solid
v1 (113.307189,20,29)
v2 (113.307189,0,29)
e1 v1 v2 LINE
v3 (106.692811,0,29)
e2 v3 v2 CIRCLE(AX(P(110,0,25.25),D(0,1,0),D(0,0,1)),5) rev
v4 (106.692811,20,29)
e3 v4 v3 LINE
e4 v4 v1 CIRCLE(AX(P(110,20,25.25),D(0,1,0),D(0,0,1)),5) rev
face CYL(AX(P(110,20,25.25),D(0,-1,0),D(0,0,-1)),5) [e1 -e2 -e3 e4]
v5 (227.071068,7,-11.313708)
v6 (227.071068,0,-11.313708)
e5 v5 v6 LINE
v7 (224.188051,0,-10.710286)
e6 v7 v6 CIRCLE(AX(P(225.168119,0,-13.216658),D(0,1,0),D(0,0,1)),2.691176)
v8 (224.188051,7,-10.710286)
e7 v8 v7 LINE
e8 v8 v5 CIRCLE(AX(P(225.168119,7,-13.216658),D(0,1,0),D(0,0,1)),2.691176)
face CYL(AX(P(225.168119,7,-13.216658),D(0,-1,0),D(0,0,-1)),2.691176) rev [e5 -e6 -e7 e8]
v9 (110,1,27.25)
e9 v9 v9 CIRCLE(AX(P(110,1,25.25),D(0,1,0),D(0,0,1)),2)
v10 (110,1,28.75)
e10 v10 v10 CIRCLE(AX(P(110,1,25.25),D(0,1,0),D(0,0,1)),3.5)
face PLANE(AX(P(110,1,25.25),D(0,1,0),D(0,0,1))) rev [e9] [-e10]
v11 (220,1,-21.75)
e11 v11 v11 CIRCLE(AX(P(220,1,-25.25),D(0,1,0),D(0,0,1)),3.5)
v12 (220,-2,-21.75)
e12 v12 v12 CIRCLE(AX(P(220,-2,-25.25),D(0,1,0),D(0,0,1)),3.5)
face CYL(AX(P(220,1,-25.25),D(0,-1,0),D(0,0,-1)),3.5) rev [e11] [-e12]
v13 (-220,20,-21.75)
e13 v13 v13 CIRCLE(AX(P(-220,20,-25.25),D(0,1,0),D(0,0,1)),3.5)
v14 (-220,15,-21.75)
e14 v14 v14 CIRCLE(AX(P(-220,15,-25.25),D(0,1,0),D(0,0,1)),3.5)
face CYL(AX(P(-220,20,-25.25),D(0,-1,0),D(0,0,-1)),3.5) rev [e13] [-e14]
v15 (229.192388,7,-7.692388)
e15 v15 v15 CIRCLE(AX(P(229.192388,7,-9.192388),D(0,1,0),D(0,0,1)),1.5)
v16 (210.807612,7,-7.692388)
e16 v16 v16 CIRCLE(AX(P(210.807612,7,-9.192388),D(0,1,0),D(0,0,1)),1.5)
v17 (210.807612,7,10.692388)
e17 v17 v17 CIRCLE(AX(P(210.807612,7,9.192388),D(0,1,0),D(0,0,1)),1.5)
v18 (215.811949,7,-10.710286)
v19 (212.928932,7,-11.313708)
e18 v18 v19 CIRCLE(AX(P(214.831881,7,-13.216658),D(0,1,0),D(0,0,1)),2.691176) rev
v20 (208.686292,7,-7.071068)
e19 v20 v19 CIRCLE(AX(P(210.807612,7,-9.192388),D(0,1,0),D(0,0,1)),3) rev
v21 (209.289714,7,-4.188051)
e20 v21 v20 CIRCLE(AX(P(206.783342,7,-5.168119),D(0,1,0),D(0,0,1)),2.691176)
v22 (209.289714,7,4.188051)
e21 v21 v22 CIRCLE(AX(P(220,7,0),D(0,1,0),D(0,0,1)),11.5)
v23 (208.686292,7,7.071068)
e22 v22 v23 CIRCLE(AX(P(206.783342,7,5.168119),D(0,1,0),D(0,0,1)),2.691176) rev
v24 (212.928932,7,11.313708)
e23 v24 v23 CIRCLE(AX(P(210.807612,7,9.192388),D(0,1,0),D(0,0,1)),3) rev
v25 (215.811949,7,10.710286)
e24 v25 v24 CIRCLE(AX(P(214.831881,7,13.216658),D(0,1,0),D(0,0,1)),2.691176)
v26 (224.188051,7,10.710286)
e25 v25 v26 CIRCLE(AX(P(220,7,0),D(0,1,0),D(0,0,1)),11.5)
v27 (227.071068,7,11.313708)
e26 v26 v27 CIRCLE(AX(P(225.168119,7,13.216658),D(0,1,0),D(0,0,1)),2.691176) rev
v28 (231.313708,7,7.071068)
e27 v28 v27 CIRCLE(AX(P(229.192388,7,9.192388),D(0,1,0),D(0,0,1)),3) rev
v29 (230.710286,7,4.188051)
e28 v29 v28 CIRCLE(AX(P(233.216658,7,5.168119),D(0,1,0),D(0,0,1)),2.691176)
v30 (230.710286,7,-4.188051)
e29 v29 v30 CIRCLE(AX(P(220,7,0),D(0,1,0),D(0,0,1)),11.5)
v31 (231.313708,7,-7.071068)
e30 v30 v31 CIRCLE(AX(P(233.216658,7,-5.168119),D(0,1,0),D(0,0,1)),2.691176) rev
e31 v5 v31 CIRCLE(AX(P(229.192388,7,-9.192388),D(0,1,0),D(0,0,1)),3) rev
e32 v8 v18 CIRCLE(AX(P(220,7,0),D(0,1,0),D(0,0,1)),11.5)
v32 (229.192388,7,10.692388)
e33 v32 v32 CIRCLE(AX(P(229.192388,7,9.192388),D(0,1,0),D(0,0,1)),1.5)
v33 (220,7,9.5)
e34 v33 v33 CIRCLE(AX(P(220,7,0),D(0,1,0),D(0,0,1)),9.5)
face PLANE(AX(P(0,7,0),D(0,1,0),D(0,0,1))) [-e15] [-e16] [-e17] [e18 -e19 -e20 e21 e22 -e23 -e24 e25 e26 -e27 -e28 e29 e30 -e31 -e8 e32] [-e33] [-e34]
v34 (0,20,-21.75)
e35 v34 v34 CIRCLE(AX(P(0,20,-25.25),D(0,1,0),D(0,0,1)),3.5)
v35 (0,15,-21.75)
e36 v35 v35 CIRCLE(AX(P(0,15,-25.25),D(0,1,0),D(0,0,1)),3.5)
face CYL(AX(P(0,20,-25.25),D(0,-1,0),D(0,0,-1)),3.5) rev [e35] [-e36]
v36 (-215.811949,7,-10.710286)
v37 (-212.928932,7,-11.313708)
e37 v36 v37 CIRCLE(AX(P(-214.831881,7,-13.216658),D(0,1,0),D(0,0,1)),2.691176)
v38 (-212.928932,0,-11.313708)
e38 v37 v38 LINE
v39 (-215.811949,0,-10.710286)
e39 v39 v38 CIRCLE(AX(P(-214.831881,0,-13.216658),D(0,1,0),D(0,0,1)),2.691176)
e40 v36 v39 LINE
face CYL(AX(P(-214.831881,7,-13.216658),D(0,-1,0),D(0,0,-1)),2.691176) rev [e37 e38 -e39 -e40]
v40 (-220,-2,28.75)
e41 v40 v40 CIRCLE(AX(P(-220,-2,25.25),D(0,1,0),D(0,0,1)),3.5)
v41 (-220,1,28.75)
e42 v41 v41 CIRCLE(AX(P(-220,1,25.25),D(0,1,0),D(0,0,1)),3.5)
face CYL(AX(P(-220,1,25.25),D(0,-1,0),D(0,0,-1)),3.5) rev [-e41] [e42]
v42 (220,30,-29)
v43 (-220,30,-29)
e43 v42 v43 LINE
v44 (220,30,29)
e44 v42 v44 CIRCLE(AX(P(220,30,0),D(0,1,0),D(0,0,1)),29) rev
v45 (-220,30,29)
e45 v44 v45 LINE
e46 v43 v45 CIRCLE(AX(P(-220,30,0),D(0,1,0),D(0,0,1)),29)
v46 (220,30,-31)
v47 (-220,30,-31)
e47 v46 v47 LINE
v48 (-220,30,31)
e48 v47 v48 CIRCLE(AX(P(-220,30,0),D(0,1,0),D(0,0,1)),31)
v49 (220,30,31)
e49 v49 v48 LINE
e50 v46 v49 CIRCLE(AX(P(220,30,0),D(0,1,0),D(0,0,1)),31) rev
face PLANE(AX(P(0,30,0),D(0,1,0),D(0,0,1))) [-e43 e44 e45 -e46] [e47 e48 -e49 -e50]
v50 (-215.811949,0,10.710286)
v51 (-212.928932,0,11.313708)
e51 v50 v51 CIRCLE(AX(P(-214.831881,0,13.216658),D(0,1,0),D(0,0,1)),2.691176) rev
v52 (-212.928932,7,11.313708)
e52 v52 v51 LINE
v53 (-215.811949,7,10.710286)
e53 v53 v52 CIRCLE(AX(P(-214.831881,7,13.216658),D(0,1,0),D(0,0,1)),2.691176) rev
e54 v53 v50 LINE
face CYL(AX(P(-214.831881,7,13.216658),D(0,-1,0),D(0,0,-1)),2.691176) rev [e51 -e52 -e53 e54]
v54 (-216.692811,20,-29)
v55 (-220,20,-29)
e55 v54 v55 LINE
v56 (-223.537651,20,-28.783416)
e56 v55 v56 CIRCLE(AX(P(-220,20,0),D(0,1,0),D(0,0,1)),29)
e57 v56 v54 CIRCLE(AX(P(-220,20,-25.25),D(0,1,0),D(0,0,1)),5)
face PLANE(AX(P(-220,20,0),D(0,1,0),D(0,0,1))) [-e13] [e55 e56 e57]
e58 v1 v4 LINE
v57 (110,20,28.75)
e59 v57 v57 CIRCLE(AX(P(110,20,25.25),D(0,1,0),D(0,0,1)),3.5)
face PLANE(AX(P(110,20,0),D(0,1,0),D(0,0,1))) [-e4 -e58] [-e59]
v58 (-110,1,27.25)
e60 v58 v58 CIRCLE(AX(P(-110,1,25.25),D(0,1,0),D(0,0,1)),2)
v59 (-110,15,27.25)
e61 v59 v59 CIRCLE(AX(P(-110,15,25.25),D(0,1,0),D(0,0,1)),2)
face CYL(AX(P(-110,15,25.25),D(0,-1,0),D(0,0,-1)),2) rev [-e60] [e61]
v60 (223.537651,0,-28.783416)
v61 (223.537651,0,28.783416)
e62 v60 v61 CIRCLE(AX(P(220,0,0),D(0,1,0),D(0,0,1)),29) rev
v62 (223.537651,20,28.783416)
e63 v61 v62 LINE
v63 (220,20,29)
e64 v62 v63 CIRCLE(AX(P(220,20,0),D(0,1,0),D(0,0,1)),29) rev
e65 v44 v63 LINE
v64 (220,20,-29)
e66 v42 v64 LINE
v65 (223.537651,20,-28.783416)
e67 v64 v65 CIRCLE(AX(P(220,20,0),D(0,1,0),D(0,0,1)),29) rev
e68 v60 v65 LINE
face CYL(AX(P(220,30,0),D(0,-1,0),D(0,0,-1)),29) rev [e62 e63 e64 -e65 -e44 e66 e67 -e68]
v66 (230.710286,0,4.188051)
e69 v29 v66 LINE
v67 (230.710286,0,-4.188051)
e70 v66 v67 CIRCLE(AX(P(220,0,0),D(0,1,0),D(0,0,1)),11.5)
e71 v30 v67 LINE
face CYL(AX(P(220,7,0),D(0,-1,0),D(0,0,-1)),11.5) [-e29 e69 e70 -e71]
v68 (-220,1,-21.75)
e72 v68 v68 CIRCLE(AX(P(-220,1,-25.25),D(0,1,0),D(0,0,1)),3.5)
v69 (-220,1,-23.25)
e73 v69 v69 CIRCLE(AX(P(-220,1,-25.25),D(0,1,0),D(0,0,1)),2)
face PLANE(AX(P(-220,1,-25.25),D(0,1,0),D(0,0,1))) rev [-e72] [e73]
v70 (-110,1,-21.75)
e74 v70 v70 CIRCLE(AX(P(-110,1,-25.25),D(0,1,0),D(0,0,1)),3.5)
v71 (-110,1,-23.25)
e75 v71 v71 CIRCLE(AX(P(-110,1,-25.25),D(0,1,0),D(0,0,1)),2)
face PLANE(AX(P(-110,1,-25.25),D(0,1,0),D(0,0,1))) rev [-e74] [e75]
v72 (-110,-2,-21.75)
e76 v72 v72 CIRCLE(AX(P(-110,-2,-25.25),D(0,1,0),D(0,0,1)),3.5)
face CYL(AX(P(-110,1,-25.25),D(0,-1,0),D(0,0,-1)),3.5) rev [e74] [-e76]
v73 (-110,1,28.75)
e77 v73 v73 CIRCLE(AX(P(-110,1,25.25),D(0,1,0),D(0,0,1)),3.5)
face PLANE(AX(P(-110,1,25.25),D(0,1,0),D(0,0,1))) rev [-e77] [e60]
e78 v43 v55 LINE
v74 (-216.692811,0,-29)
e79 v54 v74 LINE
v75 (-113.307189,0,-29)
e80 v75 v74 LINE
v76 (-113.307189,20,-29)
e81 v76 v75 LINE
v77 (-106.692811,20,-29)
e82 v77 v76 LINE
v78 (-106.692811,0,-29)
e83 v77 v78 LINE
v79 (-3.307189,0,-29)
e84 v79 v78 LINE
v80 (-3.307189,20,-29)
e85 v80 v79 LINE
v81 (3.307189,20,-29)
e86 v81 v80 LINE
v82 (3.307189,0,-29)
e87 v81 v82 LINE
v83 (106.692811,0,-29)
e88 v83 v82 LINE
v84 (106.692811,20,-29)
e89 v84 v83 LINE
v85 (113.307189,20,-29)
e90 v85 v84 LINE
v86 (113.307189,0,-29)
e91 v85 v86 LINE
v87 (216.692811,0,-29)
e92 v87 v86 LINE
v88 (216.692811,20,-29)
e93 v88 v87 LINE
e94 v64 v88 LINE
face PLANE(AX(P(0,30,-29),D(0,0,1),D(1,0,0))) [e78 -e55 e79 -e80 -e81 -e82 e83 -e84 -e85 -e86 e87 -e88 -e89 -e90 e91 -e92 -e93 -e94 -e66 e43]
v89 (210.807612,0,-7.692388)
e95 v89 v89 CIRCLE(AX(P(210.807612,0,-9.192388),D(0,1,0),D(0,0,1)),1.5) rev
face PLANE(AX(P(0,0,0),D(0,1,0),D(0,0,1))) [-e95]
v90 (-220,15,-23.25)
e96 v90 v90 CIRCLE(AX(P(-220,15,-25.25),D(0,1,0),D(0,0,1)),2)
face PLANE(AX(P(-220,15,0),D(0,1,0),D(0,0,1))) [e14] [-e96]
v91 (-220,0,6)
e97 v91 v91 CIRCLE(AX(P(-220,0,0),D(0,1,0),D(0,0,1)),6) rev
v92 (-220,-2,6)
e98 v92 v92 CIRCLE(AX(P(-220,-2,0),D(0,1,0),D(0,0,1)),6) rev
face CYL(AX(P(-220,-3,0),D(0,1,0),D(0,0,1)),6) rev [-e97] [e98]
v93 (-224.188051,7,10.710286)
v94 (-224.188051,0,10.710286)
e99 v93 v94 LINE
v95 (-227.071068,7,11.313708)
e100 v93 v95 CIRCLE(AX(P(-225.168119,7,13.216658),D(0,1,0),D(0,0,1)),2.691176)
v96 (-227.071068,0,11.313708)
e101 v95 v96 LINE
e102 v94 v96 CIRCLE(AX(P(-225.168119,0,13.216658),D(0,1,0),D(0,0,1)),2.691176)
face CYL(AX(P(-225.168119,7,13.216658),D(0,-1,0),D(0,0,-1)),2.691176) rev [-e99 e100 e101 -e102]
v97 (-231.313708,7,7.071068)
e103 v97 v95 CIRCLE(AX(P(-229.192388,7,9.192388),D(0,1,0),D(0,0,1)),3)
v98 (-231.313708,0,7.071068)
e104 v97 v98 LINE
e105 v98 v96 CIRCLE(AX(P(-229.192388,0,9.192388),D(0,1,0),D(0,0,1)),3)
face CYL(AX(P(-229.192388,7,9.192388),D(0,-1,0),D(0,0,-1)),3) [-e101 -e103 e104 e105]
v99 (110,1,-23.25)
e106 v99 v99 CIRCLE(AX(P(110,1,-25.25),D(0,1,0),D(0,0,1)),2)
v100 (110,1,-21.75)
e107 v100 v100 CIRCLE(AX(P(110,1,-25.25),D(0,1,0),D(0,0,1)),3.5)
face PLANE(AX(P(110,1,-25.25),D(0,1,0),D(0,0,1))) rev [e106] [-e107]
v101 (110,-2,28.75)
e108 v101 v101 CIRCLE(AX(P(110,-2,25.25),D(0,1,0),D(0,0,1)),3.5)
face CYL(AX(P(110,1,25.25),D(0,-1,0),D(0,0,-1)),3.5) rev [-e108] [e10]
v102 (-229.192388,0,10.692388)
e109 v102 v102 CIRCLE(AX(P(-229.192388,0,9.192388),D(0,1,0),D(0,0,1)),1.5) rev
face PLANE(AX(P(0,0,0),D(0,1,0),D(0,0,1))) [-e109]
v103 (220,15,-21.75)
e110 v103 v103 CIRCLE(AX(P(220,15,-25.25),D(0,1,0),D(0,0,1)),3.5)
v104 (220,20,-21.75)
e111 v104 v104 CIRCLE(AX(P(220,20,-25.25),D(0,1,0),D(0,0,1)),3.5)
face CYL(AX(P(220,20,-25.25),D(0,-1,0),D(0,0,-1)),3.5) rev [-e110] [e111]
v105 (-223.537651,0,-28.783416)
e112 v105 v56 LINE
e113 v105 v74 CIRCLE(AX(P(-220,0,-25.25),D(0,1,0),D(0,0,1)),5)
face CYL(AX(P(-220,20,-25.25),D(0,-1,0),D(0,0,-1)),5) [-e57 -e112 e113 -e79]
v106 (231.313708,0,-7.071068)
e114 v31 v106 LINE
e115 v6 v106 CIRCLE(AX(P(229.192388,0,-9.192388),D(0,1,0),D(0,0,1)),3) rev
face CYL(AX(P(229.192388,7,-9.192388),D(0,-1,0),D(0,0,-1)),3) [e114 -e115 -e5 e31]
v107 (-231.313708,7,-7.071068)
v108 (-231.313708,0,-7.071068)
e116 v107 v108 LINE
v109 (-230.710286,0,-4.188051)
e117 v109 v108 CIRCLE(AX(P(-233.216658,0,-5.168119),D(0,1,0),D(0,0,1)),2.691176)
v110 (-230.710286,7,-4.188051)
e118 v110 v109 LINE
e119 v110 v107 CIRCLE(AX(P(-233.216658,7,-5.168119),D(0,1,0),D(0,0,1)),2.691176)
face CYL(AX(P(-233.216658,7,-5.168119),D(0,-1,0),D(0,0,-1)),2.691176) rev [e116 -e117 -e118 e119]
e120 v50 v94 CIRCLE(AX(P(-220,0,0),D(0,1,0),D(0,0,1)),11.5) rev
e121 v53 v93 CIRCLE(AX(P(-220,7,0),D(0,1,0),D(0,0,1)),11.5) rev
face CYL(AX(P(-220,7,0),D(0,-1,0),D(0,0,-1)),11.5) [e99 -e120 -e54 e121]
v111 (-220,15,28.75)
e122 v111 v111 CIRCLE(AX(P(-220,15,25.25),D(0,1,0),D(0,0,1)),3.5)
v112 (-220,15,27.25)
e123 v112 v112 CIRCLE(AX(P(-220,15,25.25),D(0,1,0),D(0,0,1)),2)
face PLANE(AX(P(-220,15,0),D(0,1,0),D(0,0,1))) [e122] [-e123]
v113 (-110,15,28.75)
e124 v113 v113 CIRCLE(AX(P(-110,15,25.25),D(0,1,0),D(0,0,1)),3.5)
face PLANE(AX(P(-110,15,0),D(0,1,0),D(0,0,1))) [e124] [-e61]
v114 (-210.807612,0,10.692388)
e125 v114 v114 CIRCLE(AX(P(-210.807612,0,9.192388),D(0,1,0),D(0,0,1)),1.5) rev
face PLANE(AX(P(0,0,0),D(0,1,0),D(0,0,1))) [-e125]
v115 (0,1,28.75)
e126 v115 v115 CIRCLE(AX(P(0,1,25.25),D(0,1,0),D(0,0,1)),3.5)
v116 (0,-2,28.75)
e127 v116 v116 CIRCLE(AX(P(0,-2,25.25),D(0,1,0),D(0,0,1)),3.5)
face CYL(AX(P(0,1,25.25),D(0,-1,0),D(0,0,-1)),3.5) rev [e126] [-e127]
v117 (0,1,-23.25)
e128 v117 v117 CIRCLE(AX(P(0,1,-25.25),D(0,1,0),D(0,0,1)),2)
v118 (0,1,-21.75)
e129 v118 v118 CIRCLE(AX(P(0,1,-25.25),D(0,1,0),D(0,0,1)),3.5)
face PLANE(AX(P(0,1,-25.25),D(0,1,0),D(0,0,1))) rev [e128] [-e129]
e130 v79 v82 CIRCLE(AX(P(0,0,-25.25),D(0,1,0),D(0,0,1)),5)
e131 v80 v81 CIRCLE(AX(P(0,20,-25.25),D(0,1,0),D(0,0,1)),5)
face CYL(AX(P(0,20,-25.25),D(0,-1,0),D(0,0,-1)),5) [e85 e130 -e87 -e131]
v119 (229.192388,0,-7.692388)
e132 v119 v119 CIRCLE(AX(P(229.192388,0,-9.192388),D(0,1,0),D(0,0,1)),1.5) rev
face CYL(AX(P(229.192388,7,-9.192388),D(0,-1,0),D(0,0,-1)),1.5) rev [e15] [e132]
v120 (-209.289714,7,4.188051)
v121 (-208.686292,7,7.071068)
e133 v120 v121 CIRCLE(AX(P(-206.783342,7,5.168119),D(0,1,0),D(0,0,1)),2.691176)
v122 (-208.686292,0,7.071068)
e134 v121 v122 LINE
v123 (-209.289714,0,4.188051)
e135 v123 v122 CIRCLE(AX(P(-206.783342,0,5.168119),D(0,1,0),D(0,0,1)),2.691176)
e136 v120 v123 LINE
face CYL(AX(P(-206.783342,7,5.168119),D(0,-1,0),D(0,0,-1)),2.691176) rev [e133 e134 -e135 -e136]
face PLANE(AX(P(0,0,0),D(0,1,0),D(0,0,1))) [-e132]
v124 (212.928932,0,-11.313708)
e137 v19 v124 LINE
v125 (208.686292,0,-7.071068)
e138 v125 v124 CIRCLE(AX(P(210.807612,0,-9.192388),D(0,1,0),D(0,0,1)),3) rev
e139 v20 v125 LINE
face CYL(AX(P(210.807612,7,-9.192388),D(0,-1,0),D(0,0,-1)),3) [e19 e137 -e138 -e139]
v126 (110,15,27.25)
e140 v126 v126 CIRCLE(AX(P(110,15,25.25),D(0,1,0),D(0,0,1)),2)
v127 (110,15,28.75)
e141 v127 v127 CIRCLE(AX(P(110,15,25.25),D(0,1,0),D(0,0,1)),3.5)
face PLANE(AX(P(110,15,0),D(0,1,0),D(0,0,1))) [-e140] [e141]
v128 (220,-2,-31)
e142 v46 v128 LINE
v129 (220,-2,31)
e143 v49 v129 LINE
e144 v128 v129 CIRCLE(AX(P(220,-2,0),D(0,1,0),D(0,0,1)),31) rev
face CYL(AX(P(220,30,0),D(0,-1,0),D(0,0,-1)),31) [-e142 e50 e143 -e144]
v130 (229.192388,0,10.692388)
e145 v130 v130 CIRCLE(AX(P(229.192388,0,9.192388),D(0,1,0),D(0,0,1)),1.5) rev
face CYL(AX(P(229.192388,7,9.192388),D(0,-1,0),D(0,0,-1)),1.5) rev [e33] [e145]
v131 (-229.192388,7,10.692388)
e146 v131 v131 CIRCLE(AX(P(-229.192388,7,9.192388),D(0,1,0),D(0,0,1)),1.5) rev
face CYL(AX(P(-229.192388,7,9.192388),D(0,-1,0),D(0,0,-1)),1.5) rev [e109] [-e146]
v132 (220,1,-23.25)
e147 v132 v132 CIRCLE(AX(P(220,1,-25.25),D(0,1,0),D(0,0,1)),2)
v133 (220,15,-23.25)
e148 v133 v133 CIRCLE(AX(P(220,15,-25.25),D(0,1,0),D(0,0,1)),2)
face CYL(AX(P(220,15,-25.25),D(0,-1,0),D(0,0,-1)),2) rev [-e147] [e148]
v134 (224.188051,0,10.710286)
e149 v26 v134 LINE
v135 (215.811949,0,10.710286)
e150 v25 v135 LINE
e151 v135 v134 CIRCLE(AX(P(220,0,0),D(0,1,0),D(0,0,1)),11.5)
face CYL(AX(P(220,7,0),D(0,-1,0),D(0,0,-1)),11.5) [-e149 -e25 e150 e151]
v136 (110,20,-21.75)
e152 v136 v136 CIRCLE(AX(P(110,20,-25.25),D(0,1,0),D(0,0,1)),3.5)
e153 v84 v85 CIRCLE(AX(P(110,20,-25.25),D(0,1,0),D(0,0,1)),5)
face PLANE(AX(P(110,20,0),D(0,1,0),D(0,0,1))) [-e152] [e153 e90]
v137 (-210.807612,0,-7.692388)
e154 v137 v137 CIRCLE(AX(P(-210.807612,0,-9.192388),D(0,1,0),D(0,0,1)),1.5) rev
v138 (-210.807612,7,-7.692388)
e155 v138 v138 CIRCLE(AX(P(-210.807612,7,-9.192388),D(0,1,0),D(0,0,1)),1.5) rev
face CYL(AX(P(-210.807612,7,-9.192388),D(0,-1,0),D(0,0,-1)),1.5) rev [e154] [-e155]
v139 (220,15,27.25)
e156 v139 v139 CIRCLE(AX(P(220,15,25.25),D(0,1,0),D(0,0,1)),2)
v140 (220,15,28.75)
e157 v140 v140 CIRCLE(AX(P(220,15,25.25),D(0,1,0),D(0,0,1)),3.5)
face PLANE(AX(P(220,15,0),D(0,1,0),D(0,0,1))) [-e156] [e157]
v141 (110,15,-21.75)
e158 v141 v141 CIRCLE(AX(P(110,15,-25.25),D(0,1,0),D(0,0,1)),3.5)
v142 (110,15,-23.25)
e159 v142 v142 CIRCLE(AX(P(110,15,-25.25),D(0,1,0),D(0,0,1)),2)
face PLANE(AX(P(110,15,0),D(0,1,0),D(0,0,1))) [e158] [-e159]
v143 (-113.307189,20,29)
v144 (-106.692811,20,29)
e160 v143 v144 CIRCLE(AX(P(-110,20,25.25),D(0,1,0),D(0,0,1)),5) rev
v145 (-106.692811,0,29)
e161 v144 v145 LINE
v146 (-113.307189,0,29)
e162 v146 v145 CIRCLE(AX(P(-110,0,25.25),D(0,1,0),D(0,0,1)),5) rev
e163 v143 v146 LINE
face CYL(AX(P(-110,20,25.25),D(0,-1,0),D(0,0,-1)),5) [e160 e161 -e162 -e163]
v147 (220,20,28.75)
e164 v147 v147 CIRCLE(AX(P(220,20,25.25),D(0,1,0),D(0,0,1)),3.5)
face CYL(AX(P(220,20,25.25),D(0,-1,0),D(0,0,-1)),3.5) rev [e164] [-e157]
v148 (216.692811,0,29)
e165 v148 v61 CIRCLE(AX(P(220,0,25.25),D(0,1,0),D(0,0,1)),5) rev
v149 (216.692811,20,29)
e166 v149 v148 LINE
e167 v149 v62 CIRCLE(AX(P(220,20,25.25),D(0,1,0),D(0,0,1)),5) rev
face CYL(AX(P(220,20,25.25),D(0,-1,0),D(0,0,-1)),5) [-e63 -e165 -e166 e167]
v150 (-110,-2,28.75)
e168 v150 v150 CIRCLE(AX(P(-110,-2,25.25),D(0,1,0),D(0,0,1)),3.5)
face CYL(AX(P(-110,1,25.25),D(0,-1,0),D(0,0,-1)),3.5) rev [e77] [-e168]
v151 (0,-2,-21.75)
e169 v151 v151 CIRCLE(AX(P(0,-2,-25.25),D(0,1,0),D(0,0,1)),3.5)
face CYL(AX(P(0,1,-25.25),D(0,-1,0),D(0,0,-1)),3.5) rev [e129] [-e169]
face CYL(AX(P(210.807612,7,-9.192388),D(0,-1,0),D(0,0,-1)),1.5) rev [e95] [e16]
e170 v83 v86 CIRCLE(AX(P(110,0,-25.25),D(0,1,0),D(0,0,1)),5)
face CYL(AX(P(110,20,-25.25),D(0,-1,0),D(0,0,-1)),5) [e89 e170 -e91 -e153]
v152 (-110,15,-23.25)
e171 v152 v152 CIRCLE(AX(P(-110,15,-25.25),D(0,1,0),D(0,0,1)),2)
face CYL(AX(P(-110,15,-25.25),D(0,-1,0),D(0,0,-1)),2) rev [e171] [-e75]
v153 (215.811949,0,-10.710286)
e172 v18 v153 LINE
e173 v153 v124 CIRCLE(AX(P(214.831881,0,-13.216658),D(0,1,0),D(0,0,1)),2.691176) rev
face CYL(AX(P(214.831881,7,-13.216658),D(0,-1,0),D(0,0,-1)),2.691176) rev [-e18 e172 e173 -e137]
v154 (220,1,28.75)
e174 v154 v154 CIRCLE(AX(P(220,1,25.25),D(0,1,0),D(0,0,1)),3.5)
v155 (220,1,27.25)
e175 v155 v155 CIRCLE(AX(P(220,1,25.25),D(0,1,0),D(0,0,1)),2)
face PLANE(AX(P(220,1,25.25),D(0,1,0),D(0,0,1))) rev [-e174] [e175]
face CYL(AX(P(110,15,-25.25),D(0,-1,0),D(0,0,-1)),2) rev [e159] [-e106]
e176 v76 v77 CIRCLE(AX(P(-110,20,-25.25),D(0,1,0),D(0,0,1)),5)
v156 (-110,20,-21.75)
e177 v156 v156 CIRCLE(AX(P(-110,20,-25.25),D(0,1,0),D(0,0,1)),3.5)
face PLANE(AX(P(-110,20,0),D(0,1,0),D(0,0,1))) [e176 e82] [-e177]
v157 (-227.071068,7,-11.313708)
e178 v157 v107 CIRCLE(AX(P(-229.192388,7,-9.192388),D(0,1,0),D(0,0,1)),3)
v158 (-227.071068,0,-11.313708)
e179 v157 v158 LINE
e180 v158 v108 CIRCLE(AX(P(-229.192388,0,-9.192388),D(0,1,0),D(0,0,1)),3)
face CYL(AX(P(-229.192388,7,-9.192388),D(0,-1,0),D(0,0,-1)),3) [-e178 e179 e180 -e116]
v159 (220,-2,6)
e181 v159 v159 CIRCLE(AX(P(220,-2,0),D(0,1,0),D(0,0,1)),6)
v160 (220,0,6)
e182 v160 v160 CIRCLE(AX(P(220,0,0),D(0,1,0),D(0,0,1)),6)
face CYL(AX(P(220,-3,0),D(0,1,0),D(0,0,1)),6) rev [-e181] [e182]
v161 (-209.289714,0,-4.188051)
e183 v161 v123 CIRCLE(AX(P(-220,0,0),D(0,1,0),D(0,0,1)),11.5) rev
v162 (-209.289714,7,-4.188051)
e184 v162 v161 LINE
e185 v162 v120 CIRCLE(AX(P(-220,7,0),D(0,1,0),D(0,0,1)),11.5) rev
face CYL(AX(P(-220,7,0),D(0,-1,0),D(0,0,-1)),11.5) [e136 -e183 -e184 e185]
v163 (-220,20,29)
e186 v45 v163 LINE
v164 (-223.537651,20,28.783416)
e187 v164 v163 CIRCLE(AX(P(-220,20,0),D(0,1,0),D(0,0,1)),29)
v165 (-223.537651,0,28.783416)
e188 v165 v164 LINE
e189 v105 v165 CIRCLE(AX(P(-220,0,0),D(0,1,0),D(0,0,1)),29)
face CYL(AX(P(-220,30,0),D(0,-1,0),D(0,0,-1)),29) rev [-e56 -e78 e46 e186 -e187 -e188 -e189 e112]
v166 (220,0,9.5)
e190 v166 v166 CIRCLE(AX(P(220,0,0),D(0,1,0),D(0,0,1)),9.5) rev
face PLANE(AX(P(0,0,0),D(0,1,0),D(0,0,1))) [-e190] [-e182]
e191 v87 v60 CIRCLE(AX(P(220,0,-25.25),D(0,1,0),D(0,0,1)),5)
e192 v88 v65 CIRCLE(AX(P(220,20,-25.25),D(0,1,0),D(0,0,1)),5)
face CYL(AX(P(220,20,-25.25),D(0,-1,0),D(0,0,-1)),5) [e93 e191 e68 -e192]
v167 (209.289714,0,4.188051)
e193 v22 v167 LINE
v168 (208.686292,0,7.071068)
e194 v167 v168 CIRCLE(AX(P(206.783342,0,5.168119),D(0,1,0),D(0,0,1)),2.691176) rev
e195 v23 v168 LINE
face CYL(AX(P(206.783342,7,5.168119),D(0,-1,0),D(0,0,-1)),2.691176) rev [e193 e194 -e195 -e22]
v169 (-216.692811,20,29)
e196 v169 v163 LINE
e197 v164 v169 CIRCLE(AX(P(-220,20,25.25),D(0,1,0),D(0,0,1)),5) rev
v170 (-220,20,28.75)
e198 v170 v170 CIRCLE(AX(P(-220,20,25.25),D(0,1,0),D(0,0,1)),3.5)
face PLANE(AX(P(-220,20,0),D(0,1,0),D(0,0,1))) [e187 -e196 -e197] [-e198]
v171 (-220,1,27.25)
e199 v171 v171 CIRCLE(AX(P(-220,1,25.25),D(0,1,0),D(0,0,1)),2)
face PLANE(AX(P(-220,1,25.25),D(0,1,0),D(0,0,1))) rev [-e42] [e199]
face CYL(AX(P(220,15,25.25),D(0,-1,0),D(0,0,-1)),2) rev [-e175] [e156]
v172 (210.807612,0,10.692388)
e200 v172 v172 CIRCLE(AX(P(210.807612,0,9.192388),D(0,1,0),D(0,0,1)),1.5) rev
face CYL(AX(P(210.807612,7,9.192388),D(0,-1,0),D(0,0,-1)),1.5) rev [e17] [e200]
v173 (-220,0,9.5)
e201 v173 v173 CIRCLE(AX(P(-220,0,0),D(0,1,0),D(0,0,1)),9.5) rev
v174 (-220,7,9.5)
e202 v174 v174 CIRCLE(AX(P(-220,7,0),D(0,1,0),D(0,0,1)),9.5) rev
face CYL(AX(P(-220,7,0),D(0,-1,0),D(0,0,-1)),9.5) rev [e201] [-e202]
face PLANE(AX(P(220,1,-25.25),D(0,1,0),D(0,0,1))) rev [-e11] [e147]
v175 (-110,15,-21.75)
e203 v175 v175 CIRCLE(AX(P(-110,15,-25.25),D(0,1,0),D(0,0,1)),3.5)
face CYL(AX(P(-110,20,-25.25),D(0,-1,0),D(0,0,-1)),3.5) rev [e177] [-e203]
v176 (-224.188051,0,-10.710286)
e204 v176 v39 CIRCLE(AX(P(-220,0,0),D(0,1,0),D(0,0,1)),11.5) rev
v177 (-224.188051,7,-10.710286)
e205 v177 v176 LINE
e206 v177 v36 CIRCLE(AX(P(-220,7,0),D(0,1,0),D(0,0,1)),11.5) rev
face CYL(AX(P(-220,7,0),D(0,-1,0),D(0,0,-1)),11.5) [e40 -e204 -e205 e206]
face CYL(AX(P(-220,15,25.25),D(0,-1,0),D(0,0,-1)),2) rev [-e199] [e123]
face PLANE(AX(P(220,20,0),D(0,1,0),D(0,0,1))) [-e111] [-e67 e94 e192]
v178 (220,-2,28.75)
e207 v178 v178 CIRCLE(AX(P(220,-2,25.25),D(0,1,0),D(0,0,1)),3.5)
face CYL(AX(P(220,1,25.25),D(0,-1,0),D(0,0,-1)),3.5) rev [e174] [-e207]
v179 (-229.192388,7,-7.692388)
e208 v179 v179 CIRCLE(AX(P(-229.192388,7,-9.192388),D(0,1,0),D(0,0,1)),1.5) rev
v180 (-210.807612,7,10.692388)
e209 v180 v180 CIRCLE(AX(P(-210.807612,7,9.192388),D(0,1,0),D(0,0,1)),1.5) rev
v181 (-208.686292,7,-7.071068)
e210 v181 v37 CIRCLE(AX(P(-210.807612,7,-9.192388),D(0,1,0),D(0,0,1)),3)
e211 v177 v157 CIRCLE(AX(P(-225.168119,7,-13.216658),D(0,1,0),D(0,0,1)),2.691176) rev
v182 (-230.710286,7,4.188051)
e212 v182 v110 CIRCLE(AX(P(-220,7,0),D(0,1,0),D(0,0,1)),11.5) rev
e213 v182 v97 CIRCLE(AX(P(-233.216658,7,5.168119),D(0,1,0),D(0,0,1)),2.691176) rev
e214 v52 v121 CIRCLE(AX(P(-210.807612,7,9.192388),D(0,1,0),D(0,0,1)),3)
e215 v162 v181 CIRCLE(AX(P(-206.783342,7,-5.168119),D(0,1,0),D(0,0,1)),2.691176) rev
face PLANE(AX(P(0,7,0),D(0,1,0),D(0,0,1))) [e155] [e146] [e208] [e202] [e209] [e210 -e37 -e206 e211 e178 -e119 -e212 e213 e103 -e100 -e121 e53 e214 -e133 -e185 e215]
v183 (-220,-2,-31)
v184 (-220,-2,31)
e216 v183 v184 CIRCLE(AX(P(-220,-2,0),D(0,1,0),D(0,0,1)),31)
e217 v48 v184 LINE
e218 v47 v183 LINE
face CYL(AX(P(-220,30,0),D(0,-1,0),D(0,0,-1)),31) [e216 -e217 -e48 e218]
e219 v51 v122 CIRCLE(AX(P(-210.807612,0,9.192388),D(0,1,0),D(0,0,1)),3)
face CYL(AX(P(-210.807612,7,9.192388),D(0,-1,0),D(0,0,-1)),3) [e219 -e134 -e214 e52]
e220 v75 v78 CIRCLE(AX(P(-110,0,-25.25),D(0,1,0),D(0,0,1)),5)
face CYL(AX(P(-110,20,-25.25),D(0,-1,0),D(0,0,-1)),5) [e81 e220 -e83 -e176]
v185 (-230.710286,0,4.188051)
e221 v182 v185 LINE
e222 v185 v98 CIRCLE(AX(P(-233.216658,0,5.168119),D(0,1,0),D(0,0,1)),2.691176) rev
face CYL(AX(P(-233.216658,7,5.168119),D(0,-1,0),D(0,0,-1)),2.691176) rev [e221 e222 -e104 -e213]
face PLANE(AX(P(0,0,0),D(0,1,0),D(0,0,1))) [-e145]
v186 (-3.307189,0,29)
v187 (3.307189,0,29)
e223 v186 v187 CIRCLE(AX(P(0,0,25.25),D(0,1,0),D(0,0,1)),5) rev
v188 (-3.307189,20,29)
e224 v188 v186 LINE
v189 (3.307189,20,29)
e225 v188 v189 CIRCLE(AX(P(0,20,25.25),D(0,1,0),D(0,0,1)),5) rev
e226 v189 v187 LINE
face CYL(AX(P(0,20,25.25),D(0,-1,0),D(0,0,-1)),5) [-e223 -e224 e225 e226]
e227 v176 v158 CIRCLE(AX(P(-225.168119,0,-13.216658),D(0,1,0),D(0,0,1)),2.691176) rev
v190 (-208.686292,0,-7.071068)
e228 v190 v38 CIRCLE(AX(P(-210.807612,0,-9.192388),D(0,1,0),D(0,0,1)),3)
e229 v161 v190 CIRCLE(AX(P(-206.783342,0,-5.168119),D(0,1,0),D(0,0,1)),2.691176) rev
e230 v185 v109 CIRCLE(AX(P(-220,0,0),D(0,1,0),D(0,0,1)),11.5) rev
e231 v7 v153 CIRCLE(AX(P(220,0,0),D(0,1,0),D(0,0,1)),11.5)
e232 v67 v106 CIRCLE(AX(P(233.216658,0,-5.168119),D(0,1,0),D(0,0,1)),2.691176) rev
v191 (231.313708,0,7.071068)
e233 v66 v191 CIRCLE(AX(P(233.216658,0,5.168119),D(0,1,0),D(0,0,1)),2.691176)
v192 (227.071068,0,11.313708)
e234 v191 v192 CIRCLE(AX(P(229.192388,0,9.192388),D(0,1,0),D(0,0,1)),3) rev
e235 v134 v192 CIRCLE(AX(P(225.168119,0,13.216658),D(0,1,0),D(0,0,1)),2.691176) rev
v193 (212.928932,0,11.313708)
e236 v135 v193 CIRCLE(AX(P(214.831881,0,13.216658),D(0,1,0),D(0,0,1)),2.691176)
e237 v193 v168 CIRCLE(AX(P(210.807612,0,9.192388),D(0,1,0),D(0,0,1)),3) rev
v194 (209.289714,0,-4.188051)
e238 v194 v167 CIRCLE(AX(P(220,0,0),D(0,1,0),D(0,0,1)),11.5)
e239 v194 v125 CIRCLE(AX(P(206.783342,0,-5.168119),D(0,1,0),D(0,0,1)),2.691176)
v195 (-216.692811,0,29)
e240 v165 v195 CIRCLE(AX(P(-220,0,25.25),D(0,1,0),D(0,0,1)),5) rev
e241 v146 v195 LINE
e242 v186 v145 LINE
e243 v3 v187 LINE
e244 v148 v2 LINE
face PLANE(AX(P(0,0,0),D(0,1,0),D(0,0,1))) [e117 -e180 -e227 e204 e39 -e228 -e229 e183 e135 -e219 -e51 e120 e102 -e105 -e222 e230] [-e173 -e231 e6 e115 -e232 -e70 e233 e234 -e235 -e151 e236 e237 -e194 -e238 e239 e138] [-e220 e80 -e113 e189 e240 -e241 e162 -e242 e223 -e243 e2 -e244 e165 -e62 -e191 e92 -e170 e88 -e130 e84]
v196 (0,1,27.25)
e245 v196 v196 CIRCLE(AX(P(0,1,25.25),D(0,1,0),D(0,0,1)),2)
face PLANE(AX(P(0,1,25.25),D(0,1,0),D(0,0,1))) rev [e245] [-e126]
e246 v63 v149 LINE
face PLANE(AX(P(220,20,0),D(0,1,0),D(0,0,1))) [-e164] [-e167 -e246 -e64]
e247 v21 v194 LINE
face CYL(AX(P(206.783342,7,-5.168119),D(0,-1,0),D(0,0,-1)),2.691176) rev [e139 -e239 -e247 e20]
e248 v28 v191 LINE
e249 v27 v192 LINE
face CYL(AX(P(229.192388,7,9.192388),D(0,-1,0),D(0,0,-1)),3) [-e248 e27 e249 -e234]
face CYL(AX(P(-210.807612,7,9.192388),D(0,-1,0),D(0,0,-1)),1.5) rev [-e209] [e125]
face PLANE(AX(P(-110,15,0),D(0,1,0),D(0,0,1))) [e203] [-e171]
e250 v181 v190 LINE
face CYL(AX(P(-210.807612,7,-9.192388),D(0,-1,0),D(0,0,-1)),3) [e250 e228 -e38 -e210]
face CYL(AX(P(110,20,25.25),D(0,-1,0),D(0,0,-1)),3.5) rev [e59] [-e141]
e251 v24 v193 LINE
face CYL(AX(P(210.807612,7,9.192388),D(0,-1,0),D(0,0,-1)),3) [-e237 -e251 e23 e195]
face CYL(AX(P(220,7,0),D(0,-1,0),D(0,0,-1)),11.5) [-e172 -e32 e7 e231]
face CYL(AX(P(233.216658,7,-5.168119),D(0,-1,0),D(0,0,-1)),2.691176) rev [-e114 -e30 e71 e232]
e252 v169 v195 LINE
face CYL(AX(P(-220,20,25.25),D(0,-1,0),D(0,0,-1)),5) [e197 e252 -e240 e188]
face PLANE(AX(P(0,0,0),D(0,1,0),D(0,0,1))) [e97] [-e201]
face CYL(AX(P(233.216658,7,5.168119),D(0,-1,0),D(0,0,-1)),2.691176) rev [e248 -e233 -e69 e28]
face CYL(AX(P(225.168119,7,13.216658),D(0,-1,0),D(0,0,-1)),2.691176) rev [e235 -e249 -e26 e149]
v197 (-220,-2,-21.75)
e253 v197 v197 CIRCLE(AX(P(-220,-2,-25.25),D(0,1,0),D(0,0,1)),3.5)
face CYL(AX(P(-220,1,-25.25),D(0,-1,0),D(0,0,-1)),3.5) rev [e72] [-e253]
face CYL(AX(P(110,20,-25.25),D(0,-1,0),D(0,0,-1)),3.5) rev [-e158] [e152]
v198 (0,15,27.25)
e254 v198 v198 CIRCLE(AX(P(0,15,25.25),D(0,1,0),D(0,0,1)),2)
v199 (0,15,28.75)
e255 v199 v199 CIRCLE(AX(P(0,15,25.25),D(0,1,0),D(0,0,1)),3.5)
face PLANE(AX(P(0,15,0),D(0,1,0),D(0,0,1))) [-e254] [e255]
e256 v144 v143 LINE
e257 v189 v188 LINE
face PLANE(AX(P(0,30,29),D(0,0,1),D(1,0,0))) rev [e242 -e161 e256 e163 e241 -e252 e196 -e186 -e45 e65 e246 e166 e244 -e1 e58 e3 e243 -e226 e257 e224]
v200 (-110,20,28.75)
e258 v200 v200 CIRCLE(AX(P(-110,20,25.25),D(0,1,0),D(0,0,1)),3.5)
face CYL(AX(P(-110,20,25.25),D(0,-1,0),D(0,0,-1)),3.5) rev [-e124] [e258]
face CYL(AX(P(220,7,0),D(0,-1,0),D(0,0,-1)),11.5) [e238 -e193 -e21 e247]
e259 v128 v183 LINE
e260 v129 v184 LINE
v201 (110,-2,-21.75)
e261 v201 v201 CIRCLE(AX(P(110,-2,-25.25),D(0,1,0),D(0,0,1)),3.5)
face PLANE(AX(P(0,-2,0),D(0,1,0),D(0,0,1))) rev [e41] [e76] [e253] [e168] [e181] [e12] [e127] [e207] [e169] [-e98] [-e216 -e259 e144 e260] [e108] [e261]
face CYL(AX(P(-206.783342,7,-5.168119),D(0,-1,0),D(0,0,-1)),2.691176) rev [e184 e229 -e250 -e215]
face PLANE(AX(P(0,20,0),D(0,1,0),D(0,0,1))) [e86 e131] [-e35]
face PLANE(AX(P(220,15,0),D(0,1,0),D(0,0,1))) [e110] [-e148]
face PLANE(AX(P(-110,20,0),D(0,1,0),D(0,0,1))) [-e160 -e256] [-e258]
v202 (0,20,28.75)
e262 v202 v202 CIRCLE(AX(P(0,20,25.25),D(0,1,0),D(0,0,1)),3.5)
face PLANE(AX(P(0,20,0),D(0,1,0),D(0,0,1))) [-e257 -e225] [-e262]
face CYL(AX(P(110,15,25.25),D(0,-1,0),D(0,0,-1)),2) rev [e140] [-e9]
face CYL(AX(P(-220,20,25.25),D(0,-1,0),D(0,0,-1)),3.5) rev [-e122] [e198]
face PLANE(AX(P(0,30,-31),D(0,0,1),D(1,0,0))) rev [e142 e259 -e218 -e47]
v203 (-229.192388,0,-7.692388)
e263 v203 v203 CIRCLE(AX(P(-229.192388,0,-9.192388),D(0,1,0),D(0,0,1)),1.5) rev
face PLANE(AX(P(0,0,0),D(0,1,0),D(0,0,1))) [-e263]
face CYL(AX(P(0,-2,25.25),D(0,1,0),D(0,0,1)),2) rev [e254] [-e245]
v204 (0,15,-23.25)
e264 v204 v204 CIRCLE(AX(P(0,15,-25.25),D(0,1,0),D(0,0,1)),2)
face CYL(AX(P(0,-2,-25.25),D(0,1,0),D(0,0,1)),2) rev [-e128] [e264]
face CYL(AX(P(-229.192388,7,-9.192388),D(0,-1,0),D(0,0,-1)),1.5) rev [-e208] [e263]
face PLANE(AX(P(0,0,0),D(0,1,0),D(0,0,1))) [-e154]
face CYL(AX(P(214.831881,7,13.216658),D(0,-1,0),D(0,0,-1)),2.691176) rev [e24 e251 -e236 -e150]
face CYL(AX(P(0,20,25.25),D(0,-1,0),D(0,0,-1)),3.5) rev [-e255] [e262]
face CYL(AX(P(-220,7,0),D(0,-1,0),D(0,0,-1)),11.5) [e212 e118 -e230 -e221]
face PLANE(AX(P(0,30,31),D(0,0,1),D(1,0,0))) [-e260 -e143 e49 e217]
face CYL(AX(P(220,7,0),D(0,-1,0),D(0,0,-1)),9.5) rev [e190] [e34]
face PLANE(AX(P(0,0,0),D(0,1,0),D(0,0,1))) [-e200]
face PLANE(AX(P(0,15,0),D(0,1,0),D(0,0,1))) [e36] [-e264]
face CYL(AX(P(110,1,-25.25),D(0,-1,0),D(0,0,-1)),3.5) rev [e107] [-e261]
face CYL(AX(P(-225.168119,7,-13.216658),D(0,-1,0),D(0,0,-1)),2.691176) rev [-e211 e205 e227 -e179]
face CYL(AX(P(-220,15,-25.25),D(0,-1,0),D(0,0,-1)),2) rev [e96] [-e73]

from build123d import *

# Parameters (mm, degrees)
BOSS_EXTRUDE1_DEPTH   = 30
SKETCH2_R             = 9.5
SKETCH2_R_2           = 1.5
BOSS_EXTRUDE2_DEPTH   = 7
BOSS_EXTRUDE2_2_DEPTH = 7
BOSS_EXTRUDE3_START   = -2
SKETCH3_3_R           = 2
BOSS_EXTRUDE3_DEPTH   = 2
SKETCH2_5_R           = 6
CUT_EXTRUDE2_DEPTH    = 3
SKETCH3_6_R           = 3.5
BOSS_EXTRUDE15_DEPTH  = 20
SKETCH3_10_R          = 3.5
SKETCH3_10_R_2        = 2
BOSS_EXTRUDE16_DEPTH  = 15
CUT_EXTRUDE3_START    = -2
SKETCH3_11_R          = 3.5
CUT_EXTRUDE3_DEPTH    = 3
LPATTERN3_COUNT       = 3
LPATTERN3_PITCH       = 110
LPATTERN3_COL_COUNT   = 3
LPATTERN3_COL_PITCH   = 110


with BuildPart() as part:
    # Sketch3 → Boss-Extrude1 (new body)
    with BuildSketch(Plane(origin=(0, 0, 0), x_dir=(1, 0, 0), z_dir=(0, 1, 0))):
        with BuildLine():
            Line((220, 31), (-220, 31))
            ThreePointArc((-220, 31), (-251, 0), (-220, -31))
            Line((-220, -31), (220, -31))
            ThreePointArc((220, -31), (251, 0), (220, 31))
        make_face()
        with BuildLine():
            Line((220, -29), (-220, -29))
            ThreePointArc((-220, -29), (-249, 0), (-220, 29))
            Line((-220, 29), (220, 29))
            ThreePointArc((220, 29), (249, 0), (220, -29))
        make_face(mode=Mode.SUBTRACT)
    extrude(amount=BOSS_EXTRUDE1_DEPTH)



with BuildPart() as body_2:
    # Sketch2 → Boss-Extrude2 (new body)
    with BuildSketch(Plane(origin=(0, 0, 0), x_dir=(1, 0, 0), z_dir=(0, 1, 0))):
        with BuildLine():
            ThreePointArc((230.710286287, 4.188050578), (230.58255933, 5.71944158), (231.313708499, 7.071067812))
            ThreePointArc((231.313708499, 7.071067812), (231.313708499, 11.313708499), (227.071067812, 11.313708499))
            ThreePointArc((227.071067812, 11.313708499), (225.71944158, 10.58255933), (224.188050578, 10.710286287))
            ThreePointArc((224.188050578, 10.710286287), (220, 11.5), (215.811949422, 10.710286287))
            ThreePointArc((215.811949422, 10.710286287), (214.28055842, 10.58255933), (212.928932188, 11.313708499))
            ThreePointArc((212.928932188, 11.313708499), (208.686291501, 11.313708499), (208.686291501, 7.071067812))
            ThreePointArc((208.686291501, 7.071067812), (209.41744067, 5.71944158), (209.289713713, 4.188050578))
            ThreePointArc((209.289713713, 4.188050578), (208.5, 0), (209.289713713, -4.188050578))
            ThreePointArc((209.289713713, -4.188050578), (209.41744067, -5.71944158), (208.686291501, -7.071067812))
            ThreePointArc((208.686291501, -7.071067812), (208.686291501, -11.313708499), (212.928932188, -11.313708499))
            ThreePointArc((212.928932188, -11.313708499), (214.28055842, -10.58255933), (215.811949422, -10.710286287))
            ThreePointArc((215.811949422, -10.710286287), (220, -11.5), (224.188050578, -10.710286287))
            ThreePointArc((224.188050578, -10.710286287), (225.71944158, -10.58255933), (227.071067812, -11.313708499))
            ThreePointArc((227.071067812, -11.313708499), (231.313708499, -11.313708499), (231.313708499, -7.071067812))
            ThreePointArc((231.313708499, -7.071067812), (230.58255933, -5.71944158), (230.710286287, -4.188050578))
            ThreePointArc((230.710286287, -4.188050578), (231.5, 0), (230.710286287, 4.188050578))
        make_face()
        with Locations(Location((220, 0, 0), (0, 0, 270))):
            Circle(SKETCH2_R, mode=Mode.SUBTRACT)
        with Locations(Location((229.192388155, 9.192388155, 0), (0, 0, 270))):
            Circle(SKETCH2_R_2, mode=Mode.SUBTRACT)
        with Locations(Location((229.192388155, -9.192388155, 0), (0, 0, 270))):
            Circle(SKETCH2_R_2, mode=Mode.SUBTRACT)
        with Locations(Location((210.807611845, 9.192388155, 0), (0, 0, 270))):
            Circle(SKETCH2_R_2, mode=Mode.SUBTRACT)
        with Locations(Location((210.807611845, -9.192388155, 0), (0, 0, 270))):
            Circle(SKETCH2_R_2, mode=Mode.SUBTRACT)
    extrude(amount=BOSS_EXTRUDE2_DEPTH)


with BuildPart() as body_3:
    # Sketch2 → Boss-Extrude2 2 (new body)
    with BuildSketch(Plane(origin=(0, 0, 0), x_dir=(1, 0, 0), z_dir=(0, 1, 0))):
        with BuildLine():
            ThreePointArc((-208.686291501, 7.071067812), (-208.686291501, 11.313708499), (-212.928932188, 11.313708499))
            ThreePointArc((-212.928932188, 11.313708499), (-214.28055842, 10.58255933), (-215.811949422, 10.710286287))
            ThreePointArc((-215.811949422, 10.710286287), (-220, 11.5), (-224.188050578, 10.710286287))
            ThreePointArc((-224.188050578, 10.710286287), (-225.71944158, 10.58255933), (-227.071067812, 11.313708499))
            ThreePointArc((-227.071067812, 11.313708499), (-231.313708499, 11.313708499), (-231.313708499, 7.071067812))
            ThreePointArc((-231.313708499, 7.071067812), (-230.58255933, 5.71944158), (-230.710286287, 4.188050578))
            ThreePointArc((-230.710286287, 4.188050578), (-231.5, 0), (-230.710286287, -4.188050578))
            ThreePointArc((-230.710286287, -4.188050578), (-230.58255933, -5.71944158), (-231.313708499, -7.071067812))
            ThreePointArc((-231.313708499, -7.071067812), (-231.313708499, -11.313708499), (-227.071067812, -11.313708499))
            ThreePointArc((-227.071067812, -11.313708499), (-225.71944158, -10.58255933), (-224.188050578, -10.710286287))
            ThreePointArc((-224.188050578, -10.710286287), (-220, -11.5), (-215.811949422, -10.710286287))
            ThreePointArc((-215.811949422, -10.710286287), (-214.28055842, -10.58255933), (-212.928932188, -11.313708499))
            ThreePointArc((-212.928932188, -11.313708499), (-208.686291501, -11.313708499), (-208.686291501, -7.071067812))
            ThreePointArc((-208.686291501, -7.071067812), (-209.41744067, -5.71944158), (-209.289713713, -4.188050578))
            ThreePointArc((-209.289713713, -4.188050578), (-208.5, 0), (-209.289713713, 4.188050578))
            ThreePointArc((-209.289713713, 4.188050578), (-209.41744067, 5.71944158), (-208.686291501, 7.071067812))
        make_face()
        with Locations(Location((-210.807611845, 9.192388155, 0), (0, 0, 270))):
            Circle(SKETCH2_R_2, mode=Mode.SUBTRACT)
        with Locations(Location((-220, 0, 0), (0, 0, 270))):
            Circle(SKETCH2_R, mode=Mode.SUBTRACT)
        with Locations(Location((-229.192388155, 9.192388155, 0), (0, 0, 270))):
            Circle(SKETCH2_R_2, mode=Mode.SUBTRACT)
        with Locations(Location((-210.807611845, -9.192388155, 0), (0, 0, 270))):
            Circle(SKETCH2_R_2, mode=Mode.SUBTRACT)
        with Locations(Location((-229.192388155, -9.192388155, 0), (0, 0, 270))):
            Circle(SKETCH2_R_2, mode=Mode.SUBTRACT)
    extrude(amount=BOSS_EXTRUDE2_2_DEPTH)


with BuildPart() as part_1:
    add(part.part)

    add(body_2.part)  # Boss-Extrude3 merges body 2

    add(body_3.part)  # Boss-Extrude3 merges body 3
    # Sketch3<3> → Boss-Extrude3 (add)
    with BuildSketch(Plane(origin=(0, 0, 0), x_dir=(1, 0, 0), z_dir=(0, 1, 0)).offset(BOSS_EXTRUDE3_START)):
        with BuildLine():
            Line((220, 31), (-220, 31))
            ThreePointArc((-220, 31), (-251, 0), (-220, -31))
            Line((-220, -31), (220, -31))
            ThreePointArc((220, -31), (251, 0), (220, 31))
        make_face()
        with Locations(Location((0, 25.25, 0), (0, 0, 270))):
            Circle(SKETCH3_3_R, mode=Mode.SUBTRACT)
        with Locations(Location((0, -25.25, 0), (0, 0, 270))):
            Circle(SKETCH3_3_R, mode=Mode.SUBTRACT)
    boss_extrude3 = extrude(amount=BOSS_EXTRUDE3_DEPTH)

    # Mirror4: Boss-Extrude3 across plane
    add(boss_extrude3.mirror(Plane(origin=(0, 0, 0), x_dir=(0, 0, 1), z_dir=(1, 0, 0))))

    # Sketch2<5> → Cut-Extrude2 (cut)
    with BuildSketch(Plane(origin=(0, 0, 0), x_dir=(1, 0, 0), z_dir=(0, 1, 0))):
        with Locations(Location((220, 0, 0), (0, 0, 270))):
            Circle(SKETCH2_5_R)
        with Locations(Location((-220, 0, 0), (0, 0, 270))):
            Circle(SKETCH2_5_R)
    extrude(amount=-CUT_EXTRUDE2_DEPTH, mode=Mode.SUBTRACT)

    # Sketch3<6> → Boss-Extrude15 (add)
    # profile 1 of 2: a face of its own
    with BuildSketch(Plane(origin=(0, 0, 0), x_dir=(1, 0, 0), z_dir=(0, 1, 0))):
        with BuildLine():
            ThreePointArc((-3.307189139, 29), (0, 20.25), (3.307189139, 29))
            Line((3.307189139, 29), (-3.307189139, 29))
        make_face()
        with Locations(Location((0, 25.25, 0), (0, 0, 270))):
            Circle(SKETCH3_6_R, mode=Mode.SUBTRACT)
    # profile 2 of 2: a face of its own
    with BuildSketch(Plane(origin=(0, 0, 0), x_dir=(1, 0, 0), z_dir=(0, 1, 0))):
        with BuildLine():
            Line((-3.307189139, -29), (3.307189139, -29))
            ThreePointArc((3.307189139, -29), (0, -20.25), (-3.307189139, -29))
        make_face()
        with Locations(Location((0, -25.25, 0), (0, 0, 270))):
            Circle(SKETCH3_6_R, mode=Mode.SUBTRACT)
    boss_extrude15 = extrude(amount=BOSS_EXTRUDE15_DEPTH)

    # Sketch3<10> → Boss-Extrude16 (add)
    # profile 1 of 2: a face of its own
    with BuildSketch(Plane(origin=(0, 0, 0), x_dir=(1, 0, 0), z_dir=(0, 1, 0))):
        with Locations(Location((0, -25.25, 0), (0, 0, 270))):
            Circle(SKETCH3_10_R)
        with Locations(Location((0, -25.25, 0), (0, 0, 270))):
            Circle(SKETCH3_10_R_2, mode=Mode.SUBTRACT)
    # profile 2 of 2: a face of its own
    with BuildSketch(Plane(origin=(0, 0, 0), x_dir=(1, 0, 0), z_dir=(0, 1, 0))):
        with Locations(Location((0, 25.25, 0), (0, 0, 270))):
            Circle(SKETCH3_10_R)
        with Locations(Location((0, 25.25, 0), (0, 0, 270))):
            Circle(SKETCH3_10_R_2, mode=Mode.SUBTRACT)
    boss_extrude16 = extrude(amount=BOSS_EXTRUDE16_DEPTH)

    # Sketch3<11> → Cut-Extrude3 (cut)
    with BuildSketch(Plane(origin=(0, 0, 0), x_dir=(1, 0, 0), z_dir=(0, 1, 0)).offset(CUT_EXTRUDE3_START)):
        with Locations(Location((0, 25.25, 0), (0, 0, 270))):
            Circle(SKETCH3_11_R)
        with Locations(Location((0, -25.25, 0), (0, 0, 270))):
            Circle(SKETCH3_11_R)
    cut_extrude3 = extrude(amount=CUT_EXTRUDE3_DEPTH, mode=Mode.SUBTRACT)

    # LPattern3: Boss-Extrude15, Boss-Extrude16, Cut-Extrude3 ×3
    with Locations(*[(i * LPATTERN3_PITCH, 0, 0) for i in range(1, LPATTERN3_COUNT)]):
        add(boss_extrude15)
        add(boss_extrude16)
        add(cut_extrude3, mode=Mode.SUBTRACT)

    # LPattern3 col: Boss-Extrude15, Boss-Extrude16, Cut-Extrude3 ×3
    with Locations(*[(-i * LPATTERN3_COL_PITCH, 0, 0) for i in range(1, LPATTERN3_COL_COUNT)]):
        add(boss_extrude15)
        add(boss_extrude16)
        add(cut_extrude3, mode=Mode.SUBTRACT)


solid = part_1.part
